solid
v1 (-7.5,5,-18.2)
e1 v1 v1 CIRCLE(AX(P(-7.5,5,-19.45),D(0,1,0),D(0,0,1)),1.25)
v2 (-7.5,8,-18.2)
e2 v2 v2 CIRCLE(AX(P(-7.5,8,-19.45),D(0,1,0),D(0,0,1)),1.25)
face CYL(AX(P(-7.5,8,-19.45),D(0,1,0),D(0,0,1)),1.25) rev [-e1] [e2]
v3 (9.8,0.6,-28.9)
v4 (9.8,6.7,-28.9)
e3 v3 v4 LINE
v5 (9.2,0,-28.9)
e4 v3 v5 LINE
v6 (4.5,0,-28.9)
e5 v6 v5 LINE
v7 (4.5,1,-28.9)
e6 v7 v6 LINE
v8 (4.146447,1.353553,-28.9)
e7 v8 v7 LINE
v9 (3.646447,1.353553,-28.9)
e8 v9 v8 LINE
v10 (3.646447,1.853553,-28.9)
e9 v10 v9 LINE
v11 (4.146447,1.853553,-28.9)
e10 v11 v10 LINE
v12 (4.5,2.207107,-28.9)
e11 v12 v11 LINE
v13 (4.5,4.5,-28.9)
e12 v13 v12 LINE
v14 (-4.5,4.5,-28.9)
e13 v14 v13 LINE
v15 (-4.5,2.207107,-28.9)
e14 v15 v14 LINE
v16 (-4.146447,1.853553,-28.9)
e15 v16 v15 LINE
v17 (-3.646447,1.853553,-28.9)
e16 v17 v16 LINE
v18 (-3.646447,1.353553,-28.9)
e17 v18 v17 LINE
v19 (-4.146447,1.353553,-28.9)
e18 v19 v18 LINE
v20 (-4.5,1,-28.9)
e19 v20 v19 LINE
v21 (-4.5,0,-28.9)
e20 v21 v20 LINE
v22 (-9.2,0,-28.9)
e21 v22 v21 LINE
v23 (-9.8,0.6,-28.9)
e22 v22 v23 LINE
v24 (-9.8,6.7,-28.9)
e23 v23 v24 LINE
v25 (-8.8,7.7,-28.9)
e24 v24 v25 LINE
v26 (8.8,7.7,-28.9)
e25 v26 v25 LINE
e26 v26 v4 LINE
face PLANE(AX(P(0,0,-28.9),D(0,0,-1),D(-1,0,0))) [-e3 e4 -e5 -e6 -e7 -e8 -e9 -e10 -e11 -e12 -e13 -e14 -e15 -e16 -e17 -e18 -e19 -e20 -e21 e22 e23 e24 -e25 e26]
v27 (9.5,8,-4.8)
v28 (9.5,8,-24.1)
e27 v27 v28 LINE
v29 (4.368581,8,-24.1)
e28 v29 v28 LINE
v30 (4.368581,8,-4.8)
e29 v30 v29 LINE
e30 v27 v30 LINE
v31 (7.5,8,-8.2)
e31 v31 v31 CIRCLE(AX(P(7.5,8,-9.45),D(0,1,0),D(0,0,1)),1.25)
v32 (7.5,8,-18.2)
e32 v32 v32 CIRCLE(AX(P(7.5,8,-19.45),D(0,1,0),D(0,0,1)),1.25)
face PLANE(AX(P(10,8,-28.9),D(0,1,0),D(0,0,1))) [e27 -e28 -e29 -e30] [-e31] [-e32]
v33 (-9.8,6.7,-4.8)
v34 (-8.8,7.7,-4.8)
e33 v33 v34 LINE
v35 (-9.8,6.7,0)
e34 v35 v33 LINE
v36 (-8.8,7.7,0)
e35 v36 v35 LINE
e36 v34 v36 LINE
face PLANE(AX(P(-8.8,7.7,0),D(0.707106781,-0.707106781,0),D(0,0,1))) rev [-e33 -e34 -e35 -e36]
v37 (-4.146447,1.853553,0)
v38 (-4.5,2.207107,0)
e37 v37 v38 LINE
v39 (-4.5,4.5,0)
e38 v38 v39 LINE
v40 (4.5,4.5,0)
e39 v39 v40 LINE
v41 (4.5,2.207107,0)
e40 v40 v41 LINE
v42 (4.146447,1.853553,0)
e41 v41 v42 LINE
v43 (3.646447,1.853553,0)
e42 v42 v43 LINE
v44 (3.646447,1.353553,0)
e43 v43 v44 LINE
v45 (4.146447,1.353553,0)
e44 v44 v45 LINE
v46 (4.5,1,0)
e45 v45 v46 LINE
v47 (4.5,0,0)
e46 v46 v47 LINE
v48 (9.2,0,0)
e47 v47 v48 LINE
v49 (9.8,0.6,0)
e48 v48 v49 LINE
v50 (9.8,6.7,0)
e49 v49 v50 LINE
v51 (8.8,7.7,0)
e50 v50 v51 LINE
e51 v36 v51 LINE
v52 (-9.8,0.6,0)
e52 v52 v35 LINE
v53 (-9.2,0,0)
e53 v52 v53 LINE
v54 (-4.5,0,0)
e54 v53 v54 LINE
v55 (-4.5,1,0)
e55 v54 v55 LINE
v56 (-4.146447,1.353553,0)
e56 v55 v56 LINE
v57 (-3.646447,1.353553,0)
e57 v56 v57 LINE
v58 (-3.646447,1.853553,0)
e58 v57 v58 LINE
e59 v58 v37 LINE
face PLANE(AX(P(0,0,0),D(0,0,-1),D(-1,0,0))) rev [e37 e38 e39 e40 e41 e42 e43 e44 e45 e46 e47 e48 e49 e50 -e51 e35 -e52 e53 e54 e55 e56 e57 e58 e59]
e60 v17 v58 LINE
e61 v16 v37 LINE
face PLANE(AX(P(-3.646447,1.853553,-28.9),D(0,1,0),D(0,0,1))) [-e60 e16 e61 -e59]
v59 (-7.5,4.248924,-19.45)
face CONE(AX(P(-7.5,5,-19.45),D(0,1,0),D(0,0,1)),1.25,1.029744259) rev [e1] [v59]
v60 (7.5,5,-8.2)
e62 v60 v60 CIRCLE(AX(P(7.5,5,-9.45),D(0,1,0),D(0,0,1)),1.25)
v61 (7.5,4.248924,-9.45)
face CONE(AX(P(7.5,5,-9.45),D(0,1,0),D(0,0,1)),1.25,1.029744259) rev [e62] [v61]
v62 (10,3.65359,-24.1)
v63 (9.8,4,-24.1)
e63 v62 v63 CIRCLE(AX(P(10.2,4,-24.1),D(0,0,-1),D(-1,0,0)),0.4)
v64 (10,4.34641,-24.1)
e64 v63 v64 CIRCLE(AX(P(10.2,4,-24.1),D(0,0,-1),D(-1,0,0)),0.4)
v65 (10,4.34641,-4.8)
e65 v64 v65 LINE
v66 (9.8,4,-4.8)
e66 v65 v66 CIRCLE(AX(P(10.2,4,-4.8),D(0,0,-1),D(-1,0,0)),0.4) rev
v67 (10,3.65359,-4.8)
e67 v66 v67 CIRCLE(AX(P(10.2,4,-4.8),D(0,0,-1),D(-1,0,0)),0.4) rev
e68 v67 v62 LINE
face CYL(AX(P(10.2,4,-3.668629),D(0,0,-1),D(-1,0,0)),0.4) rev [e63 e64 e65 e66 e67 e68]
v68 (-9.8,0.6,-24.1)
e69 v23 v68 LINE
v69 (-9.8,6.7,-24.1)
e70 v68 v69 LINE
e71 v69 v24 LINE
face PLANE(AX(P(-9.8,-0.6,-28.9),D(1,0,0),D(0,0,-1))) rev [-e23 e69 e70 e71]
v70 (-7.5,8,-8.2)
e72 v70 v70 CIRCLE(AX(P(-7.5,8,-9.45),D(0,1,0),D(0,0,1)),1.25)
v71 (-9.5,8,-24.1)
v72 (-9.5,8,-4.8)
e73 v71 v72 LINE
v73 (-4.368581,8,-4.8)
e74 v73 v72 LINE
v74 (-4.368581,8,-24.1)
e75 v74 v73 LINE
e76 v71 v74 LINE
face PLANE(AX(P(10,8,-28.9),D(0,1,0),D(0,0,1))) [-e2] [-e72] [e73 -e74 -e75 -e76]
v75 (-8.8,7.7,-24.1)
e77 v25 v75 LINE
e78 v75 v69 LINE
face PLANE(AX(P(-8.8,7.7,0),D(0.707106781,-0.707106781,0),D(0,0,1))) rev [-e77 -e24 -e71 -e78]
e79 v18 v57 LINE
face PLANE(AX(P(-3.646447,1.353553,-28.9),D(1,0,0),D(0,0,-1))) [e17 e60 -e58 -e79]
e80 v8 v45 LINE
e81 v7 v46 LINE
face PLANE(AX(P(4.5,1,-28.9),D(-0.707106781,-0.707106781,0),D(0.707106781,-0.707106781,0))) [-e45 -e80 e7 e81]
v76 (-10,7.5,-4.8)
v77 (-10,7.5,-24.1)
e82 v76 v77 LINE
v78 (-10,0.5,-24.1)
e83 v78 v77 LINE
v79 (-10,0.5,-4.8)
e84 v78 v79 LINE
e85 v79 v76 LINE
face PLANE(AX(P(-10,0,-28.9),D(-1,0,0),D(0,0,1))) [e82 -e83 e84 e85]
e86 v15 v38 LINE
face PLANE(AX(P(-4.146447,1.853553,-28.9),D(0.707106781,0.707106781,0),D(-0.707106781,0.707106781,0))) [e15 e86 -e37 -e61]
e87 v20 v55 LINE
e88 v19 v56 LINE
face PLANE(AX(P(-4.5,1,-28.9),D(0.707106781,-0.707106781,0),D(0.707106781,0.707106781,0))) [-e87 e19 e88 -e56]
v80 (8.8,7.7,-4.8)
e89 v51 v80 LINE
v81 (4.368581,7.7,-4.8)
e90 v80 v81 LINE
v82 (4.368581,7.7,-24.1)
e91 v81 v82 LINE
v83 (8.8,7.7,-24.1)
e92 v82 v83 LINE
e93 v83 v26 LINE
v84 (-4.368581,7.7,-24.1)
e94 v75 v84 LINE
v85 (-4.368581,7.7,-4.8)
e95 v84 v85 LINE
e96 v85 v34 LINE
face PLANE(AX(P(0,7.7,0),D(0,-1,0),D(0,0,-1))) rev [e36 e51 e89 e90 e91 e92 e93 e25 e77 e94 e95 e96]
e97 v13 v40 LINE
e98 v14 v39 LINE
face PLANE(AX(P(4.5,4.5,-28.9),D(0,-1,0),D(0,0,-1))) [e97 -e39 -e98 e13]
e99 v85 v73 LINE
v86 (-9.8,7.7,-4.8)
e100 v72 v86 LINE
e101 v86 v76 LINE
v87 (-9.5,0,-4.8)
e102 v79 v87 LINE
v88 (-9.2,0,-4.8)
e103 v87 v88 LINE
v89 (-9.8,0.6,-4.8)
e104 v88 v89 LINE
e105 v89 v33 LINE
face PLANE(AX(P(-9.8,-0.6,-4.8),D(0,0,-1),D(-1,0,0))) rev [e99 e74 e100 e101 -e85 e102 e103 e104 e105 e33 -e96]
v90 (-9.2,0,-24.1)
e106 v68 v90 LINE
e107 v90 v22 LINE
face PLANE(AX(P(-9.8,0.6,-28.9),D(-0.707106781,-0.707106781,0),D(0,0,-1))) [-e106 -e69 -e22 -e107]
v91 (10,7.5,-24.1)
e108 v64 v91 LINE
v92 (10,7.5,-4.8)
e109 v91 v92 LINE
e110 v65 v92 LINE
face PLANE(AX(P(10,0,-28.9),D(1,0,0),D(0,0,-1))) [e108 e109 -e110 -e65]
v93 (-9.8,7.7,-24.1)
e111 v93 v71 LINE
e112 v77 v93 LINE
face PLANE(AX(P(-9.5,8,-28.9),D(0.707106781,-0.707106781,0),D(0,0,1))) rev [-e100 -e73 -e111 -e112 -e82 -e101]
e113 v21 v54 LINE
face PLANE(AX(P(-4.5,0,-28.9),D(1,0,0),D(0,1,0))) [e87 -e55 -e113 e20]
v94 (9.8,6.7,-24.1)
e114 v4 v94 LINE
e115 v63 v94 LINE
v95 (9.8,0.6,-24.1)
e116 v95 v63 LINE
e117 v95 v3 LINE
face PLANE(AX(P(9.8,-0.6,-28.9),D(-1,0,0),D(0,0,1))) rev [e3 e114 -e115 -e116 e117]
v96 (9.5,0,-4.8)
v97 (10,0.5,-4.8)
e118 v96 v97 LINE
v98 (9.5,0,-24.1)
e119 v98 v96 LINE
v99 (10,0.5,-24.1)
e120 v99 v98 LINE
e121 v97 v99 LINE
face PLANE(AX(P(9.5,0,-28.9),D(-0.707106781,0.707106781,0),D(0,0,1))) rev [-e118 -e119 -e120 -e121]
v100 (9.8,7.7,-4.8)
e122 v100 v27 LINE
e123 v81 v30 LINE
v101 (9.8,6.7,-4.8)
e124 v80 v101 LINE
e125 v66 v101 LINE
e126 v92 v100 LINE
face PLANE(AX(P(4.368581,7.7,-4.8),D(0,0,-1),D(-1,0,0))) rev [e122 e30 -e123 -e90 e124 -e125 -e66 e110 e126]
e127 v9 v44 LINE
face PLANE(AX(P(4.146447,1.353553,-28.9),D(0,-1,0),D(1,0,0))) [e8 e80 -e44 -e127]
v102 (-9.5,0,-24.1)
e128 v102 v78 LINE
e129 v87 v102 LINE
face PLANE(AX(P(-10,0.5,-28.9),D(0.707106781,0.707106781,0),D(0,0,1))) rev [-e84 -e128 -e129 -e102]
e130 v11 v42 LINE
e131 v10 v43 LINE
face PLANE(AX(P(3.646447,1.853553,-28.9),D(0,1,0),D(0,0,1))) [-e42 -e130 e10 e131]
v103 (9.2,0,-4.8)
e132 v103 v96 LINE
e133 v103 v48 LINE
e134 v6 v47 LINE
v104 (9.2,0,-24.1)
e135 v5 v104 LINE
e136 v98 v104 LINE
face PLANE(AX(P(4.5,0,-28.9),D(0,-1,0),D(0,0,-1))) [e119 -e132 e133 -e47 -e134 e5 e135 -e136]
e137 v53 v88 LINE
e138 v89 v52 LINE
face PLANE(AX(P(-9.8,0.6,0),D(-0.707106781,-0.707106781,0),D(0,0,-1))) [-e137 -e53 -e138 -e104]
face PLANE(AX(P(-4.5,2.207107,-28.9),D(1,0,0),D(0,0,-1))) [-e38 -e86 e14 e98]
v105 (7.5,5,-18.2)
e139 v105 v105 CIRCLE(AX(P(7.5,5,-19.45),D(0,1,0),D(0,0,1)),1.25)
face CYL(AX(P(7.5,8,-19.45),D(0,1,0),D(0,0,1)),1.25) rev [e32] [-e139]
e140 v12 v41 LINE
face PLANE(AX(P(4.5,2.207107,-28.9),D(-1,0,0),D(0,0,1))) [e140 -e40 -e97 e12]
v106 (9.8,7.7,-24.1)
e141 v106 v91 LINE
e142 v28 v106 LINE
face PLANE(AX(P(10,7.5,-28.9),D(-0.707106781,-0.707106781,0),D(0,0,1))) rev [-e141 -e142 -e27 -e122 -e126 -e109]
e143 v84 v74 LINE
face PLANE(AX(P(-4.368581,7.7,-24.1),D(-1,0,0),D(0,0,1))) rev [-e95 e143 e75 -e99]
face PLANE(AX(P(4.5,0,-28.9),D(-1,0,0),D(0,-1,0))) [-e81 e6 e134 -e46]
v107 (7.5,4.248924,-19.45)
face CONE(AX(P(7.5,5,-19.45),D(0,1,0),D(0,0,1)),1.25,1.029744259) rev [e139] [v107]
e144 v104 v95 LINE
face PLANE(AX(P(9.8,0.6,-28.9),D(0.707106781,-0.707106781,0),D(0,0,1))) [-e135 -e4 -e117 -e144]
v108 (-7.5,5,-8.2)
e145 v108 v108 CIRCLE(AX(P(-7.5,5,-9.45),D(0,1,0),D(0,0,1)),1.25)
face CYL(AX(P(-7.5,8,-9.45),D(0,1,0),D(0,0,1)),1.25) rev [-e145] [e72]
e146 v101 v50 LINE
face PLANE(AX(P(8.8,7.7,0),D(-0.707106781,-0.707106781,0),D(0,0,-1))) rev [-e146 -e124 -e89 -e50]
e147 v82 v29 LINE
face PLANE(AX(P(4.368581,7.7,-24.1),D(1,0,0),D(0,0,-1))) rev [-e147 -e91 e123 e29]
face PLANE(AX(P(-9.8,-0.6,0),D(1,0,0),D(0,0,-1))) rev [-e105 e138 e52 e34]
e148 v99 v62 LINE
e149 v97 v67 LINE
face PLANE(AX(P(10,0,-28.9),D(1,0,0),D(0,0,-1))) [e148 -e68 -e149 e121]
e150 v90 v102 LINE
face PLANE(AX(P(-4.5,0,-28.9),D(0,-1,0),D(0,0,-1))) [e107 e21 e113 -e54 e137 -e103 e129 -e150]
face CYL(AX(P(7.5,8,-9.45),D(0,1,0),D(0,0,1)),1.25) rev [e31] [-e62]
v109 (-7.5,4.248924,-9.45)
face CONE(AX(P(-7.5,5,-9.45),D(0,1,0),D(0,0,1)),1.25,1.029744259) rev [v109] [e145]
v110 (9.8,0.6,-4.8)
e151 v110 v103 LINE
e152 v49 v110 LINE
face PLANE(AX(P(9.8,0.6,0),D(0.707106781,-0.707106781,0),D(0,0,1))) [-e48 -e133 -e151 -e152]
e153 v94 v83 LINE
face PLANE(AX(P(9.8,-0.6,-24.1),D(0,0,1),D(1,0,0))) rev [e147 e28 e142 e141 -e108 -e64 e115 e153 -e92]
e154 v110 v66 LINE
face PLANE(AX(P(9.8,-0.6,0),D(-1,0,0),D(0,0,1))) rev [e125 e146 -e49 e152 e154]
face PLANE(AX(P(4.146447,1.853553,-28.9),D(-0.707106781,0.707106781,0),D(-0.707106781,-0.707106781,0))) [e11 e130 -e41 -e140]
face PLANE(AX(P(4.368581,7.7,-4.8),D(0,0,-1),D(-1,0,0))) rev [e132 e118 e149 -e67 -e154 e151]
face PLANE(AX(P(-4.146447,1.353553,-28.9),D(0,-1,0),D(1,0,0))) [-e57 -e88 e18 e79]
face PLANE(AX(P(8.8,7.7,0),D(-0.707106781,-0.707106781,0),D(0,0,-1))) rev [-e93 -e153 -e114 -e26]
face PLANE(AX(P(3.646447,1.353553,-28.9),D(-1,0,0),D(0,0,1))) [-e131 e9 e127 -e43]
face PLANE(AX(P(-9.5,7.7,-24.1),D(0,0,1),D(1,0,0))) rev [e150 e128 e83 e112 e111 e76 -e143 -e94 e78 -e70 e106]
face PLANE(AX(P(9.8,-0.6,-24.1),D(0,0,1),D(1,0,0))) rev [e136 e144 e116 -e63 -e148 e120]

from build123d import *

# Parameters (mm, degrees)
EXTRUDE_1_DEPTH     = 28.9
CHAMFER_1_SIZE      = 0.5
CUT_EXTRUDE_1_DEPTH = 0.3
SKETCH_6_W          = 0.2
SKETCH_6_H          = 4.8
CUT_EXTRUDE_2_DEPTH = 8.3
CHAMFER_2_SIZE      = 1
CHAMFER_3_SIZE      = 0.6
CHAMFER_4_SIZE      = 0.5
SKETCH_7_R          = 0.4
CUT_EXTRUDE_3_DEPTH = 19.3


with BuildPart() as part:
    # 草图1 → 凸台-拉伸1 (new body)
    with BuildSketch(Plane.XY):
        Polygon((-10, 0), (-10, 8), (10, 8), (10, 0), (4.5, 0), (4.5, 1), (4.146446609, 1.353553391), (3.646446609, 1.353553391), (3.646446609, 1.853553391), (4.146446609, 1.853553391), (4.5, 2.207106781), (4.5, 4.5), (-4.5, 4.5), (-4.5, 2.207106781), (-4.146446609, 1.853553391), (-3.646446609, 1.853553391), (-3.646446609, 1.353553391), (-4.146446609, 1.353553391), (-4.5, 1), (-4.5, 0), align=None)
    extrude(amount=-EXTRUDE_1_DEPTH)

    # 草图3 → M3 螺纹孔1 (revolve, cut)
    with BuildSketch(Plane(origin=(7.5, 8, -19.45), x_dir=(0, 0, 1), z_dir=(1, 0, 0))):
        Polygon((0, 0), (0, 3.751075774), (1.25, 3), (1.25, 0), align=None)
    hole_wizard_m3_1 = revolve(axis=Axis((7.5, 14.35, -19.45), (0, -1, 0)), mode=Mode.SUBTRACT)

    # 镜向1: M3 螺纹孔1 across plane
    add(hole_wizard_m3_1.mirror(Plane(origin=(0, 0, -14.45), x_dir=(1, 0, 0), z_dir=(0, 0, -1))), mode=Mode.SUBTRACT)

    # 镜向2: M3 螺纹孔1 across plane
    add(hole_wizard_m3_1.mirror(Plane.ZY), mode=Mode.SUBTRACT)

    # 镜向2 copy 1 sketch → 镜向2 copy 1 (revolve, cut)
    with BuildSketch(Plane(origin=(-7.5, 8, -9.45), x_dir=(0, 0, -1), z_dir=(-1, 0, 0))):
        Polygon((0, 0), (0, 3.751075774), (1.25, 3), (1.25, 0), align=None)
    revolve(axis=Axis((-7.5, 14.35, -9.45), (0, -1, 0)), mode=Mode.SUBTRACT)

    # 倒角1
    chamfer_1_edges = [part.edges().sort_by_distance(p)[0] for p in [
        (10, 8, -14.45),
        (-10, 8, -14.45),
    ]]
    chamfer(chamfer_1_edges, length=CHAMFER_1_SIZE)

    # 草图5 → 切除-拉伸1 (cut)
    with BuildSketch(Plane(origin=(0, 8, 0), x_dir=(1, 0, 0), z_dir=(0, 1, 0))):
        Polygon((-9.5, 24.1), (-4.368581018, 24.1), (-4.368581018, 4.8), (-9.5, 4.8), (-10, 4.8), (-10, 0), (10, 0), (10, 4.8), (9.5, 4.8), (4.368581018, 4.8), (4.368581018, 24.1), (9.5, 24.1), (10, 24.1), (10, 28.9), (-10, 28.9), (-10, 24.1), align=None)
    extrude(amount=-CUT_EXTRUDE_1_DEPTH, mode=Mode.SUBTRACT)

    # 草图6 → 切除-拉伸2 (cut)
    with BuildSketch(Plane(origin=(0, 7.7, 0), x_dir=(1, 0, 0), z_dir=(0, 1, 0))):
        with Locations((-9.9, 26.5)):
            Rectangle(SKETCH_6_W, SKETCH_6_H)
        with Locations((9.9, 26.5)):
            Rectangle(SKETCH_6_W, SKETCH_6_H)
        with Locations((9.9, 2.4)):
            Rectangle(SKETCH_6_W, SKETCH_6_H)
        with Locations((-9.9, 2.4)):
            Rectangle(SKETCH_6_W, SKETCH_6_H)
    extrude(amount=-CUT_EXTRUDE_2_DEPTH, mode=Mode.SUBTRACT)

    # 倒角2
    # the kernel refuses this chamfer: 1 mm, written as the material it takes off along each edge
    with BuildSketch(Plane(origin=(-9.8, 7.7, -4.8), x_dir=(-0.027495876610583895, -0.9996219169112968, 0), z_dir=(0, 0, 1)), Plane(origin=(-9.8, 7.7, -31.471682988), x_dir=(-0.027495876610585623, -0.9996219169112968, 0), z_dir=(0, 0, 1))) as chamfer_2_piece_1:
        Polygon((CHAMFER_2_SIZE * 0.999621916911, CHAMFER_2_SIZE * 0.0274958766106), (-CHAMFER_2_SIZE * 0.0274958766106, CHAMFER_2_SIZE * 0.999621916911), (0, 0), align=None)
    extrude(amount=7.371682988, mode=Mode.SUBTRACT)
    with BuildSketch(Plane(origin=(9.8, 7.7, 2.571682988), x_dir=(-0.9996219169112968, 0.02749587661058651, 0), z_dir=(0, 0, -1)), Plane(origin=(9.8, 7.7, -24.1), x_dir=(-0.9996219169112968, 0.02749587661058651, 0), z_dir=(0, 0, -1))) as chamfer_2_piece_2:
        Polygon((CHAMFER_2_SIZE * 0.999621916911, -CHAMFER_2_SIZE * 0.0274958766106), (-CHAMFER_2_SIZE * 0.0274958766106, -CHAMFER_2_SIZE * 0.999621916911), (0, 0), align=None)
    extrude(amount=7.371682988, mode=Mode.SUBTRACT)

    # 倒角3
    chamfer_3_edges = [part.edges().sort_by_distance(p)[0] for p in [
        (-9.8, 0, -26.5),
        (9.8, 0, -26.5),
        (9.8, 0, -2.4),
        (-9.8, 0, -2.4),
    ]]
    chamfer(chamfer_3_edges, length=CHAMFER_3_SIZE)

    # 倒角4
    chamfer_4_edges = [part.edges().sort_by_distance(p)[0] for p in [
        (-10, 0, -14.45),
        (10, 0, -14.45),
    ]]
    chamfer(chamfer_4_edges, length=CHAMFER_4_SIZE)

    # 草图7 → 切除-拉伸3 (cut)
    with BuildSketch(Plane(origin=(0, 0, -24.1), x_dir=(-1, 0, 0), z_dir=(0, 0, -1))):
        with Locations((-10.2, 4)):
            Circle(SKETCH_7_R)
    extrude(amount=-CUT_EXTRUDE_3_DEPTH, mode=Mode.SUBTRACT)


solid = part.part
